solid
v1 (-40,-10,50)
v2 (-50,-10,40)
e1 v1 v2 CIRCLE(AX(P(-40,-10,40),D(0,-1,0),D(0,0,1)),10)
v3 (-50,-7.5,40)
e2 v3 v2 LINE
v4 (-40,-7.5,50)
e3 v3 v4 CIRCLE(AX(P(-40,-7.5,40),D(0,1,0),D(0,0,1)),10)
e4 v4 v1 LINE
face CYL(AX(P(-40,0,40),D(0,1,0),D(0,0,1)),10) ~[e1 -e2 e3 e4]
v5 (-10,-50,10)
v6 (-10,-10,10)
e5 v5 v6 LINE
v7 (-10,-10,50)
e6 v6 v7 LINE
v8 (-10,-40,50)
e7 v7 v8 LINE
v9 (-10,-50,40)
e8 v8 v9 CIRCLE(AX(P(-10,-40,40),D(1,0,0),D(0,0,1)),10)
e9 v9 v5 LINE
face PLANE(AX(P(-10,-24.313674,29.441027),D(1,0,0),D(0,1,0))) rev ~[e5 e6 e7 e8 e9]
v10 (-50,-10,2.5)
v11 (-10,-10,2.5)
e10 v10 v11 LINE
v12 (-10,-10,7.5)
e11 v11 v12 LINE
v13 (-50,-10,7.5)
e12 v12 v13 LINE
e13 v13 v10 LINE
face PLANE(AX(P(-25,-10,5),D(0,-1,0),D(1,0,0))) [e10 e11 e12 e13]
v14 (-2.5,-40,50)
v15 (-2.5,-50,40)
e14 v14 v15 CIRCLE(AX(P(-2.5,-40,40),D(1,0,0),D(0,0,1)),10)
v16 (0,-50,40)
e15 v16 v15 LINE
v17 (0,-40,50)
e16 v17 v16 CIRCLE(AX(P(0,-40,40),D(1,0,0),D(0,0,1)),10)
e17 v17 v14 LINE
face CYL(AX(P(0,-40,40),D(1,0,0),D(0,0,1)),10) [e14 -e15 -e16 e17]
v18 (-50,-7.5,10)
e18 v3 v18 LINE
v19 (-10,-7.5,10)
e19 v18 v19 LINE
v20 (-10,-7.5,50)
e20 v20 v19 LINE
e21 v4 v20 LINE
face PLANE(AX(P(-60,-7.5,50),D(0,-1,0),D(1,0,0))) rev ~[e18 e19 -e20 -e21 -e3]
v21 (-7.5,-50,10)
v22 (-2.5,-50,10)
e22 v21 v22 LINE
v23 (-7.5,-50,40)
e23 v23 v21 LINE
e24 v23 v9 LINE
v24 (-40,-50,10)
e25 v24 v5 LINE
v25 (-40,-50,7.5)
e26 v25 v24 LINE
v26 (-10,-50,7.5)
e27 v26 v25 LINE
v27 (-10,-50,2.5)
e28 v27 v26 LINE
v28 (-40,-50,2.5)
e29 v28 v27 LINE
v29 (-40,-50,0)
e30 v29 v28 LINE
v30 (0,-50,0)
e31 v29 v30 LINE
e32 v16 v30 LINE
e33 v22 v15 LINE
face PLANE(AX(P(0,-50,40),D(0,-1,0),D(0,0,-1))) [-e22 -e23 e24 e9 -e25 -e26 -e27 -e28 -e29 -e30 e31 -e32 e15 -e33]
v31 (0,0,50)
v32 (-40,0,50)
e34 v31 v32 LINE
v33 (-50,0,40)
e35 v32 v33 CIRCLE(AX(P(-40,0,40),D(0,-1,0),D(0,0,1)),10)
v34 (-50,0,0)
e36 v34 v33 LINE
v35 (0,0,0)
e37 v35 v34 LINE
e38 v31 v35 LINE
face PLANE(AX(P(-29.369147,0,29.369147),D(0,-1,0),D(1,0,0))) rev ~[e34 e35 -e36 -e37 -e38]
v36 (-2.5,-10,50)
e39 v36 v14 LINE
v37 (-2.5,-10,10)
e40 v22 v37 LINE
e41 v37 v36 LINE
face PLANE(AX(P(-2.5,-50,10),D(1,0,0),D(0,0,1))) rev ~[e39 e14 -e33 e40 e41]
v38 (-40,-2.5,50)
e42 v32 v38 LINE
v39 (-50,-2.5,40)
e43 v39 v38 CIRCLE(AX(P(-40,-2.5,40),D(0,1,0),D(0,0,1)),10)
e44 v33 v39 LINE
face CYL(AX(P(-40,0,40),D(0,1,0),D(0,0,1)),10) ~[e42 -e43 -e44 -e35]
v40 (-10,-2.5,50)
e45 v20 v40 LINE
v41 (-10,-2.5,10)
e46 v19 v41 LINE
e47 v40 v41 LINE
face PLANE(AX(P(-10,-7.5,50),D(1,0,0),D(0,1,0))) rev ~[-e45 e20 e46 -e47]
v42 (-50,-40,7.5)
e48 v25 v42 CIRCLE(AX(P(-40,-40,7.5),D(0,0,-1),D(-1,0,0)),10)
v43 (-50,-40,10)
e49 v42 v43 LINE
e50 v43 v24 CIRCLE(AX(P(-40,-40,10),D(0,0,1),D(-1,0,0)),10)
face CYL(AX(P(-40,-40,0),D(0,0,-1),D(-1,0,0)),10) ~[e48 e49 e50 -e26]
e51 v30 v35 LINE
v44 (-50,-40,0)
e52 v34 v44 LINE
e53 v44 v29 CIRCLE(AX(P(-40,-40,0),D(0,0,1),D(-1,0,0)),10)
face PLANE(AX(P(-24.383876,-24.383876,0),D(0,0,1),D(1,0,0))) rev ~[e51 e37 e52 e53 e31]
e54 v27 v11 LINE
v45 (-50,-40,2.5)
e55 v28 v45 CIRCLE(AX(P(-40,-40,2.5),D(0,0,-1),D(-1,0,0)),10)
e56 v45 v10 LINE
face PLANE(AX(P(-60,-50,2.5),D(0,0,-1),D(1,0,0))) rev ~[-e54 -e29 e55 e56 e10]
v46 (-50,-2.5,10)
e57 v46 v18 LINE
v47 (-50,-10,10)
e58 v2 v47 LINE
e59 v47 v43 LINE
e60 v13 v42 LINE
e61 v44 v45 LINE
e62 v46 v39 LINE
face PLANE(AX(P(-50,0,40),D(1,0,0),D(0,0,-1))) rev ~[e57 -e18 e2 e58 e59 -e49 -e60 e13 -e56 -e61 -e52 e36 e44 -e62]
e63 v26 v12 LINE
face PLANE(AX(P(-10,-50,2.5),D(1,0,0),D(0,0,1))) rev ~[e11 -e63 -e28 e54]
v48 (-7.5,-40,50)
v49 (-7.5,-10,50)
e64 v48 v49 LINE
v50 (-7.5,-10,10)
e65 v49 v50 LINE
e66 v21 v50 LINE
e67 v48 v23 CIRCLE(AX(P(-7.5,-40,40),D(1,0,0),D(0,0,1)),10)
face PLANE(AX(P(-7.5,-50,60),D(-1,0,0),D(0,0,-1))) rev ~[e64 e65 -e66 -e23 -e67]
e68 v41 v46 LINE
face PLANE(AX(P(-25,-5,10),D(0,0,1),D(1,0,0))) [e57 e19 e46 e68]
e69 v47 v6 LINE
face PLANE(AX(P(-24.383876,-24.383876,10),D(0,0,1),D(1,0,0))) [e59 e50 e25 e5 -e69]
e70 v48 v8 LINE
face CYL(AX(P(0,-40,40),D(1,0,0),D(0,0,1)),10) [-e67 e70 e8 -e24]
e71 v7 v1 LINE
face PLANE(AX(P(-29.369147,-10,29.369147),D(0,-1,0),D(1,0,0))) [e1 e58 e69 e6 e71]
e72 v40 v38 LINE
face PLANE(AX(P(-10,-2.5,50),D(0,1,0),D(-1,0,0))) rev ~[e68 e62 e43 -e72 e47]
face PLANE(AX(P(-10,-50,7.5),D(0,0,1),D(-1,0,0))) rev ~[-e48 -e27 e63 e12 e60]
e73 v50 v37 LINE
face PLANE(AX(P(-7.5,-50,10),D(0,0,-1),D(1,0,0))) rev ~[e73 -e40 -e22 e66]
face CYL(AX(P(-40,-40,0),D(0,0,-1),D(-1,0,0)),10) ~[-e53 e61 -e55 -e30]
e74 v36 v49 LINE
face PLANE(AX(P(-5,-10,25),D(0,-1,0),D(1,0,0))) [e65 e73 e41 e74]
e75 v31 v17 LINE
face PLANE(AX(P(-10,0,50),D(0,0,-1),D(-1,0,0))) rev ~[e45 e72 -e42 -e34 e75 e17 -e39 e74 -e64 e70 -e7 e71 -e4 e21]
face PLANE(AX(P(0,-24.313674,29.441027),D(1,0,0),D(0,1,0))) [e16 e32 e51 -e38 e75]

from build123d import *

# Parameters (mm, degrees)
F1_DEPTH = 10
F3_DEPTH = 10
F5_DEPTH = 10
F6_W     = 20
F6_H     = 5
F6_W_2   = 5
F6_H_2   = 30
F6_H_3   = 20
F7_DEPTH = 40
F8_W     = 30
F8_H     = 5
F8_W_2   = 20
F9_DEPTH = 40


# Not quite as in the source:
# - a feature names something its author has since deleted; it is built from what else it names


with BuildPart() as f1:
    # F0 (on Top) → F1 (new body)
    with BuildSketch(Plane.XY):
        with BuildLine():
            Line((0, -50), (0, 0))
            Line((0, 0), (-50, 0))
            Line((-50, 0), (-50, -40))
            ThreePointArc((-50, -40), (-47.0710678119, -47.0710678119), (-40, -50))
            Line((-40, -50), (0, -50))
        make_face()
    extrude(amount=F1_DEPTH)

    # F2 (on Right) → F3 (join)
    with BuildSketch(Plane.YZ):
        with BuildLine():
            Line((-50, 10), (0, 10))
            Line((0, 10), (0, 50))
            Line((0, 50), (-40, 50))
            ThreePointArc((-40, 50), (-47.0710678119, 47.0710678119), (-50, 40))
            Line((-50, 40), (-50, 10))
        make_face()
    extrude(amount=-F3_DEPTH)

    # F4 (on Front) → F5 (join)
    with BuildSketch(Plane.XZ):
        with BuildLine():
            Line((-50, 10), (-10, 10))
            Line((-10, 10), (-10, 50))
            Line((-10, 50), (-40, 50))
            ThreePointArc((-40, 50), (-47.0710678119, 47.0710678119), (-50, 40))
            Line((-50, 40), (-50, 10))
        make_face()
    extrude(amount=F5_DEPTH)

    # F6 (on face) → F7 (cut)
    with BuildSketch(Plane.XZ.offset(50)):
        Polygon((-15, 2.5), (-10, 2.5), (-10, 7.5), (-40, 7.5), (-40, 2.5), align=None)
        with Locations((-50, 5)):
            Rectangle(F6_W, F6_H)
        with Locations((-5, 25)):
            Rectangle(F6_W_2, F6_H_2)
        with Locations((-5, 50)):
            Rectangle(F6_W_2, F6_H_3)
    extrude(amount=-F7_DEPTH, mode=Mode.SUBTRACT)

    # F8 (on face) → F9 (cut)
    with BuildSketch(Plane.XY.offset(50)):
        with Locations((-25, -5)):
            Rectangle(F8_W, F8_H)
        with Locations((-50, -5)):
            Rectangle(F8_W_2, F8_H)
    extrude(amount=-F9_DEPTH, mode=Mode.SUBTRACT)


solid = f1.part
